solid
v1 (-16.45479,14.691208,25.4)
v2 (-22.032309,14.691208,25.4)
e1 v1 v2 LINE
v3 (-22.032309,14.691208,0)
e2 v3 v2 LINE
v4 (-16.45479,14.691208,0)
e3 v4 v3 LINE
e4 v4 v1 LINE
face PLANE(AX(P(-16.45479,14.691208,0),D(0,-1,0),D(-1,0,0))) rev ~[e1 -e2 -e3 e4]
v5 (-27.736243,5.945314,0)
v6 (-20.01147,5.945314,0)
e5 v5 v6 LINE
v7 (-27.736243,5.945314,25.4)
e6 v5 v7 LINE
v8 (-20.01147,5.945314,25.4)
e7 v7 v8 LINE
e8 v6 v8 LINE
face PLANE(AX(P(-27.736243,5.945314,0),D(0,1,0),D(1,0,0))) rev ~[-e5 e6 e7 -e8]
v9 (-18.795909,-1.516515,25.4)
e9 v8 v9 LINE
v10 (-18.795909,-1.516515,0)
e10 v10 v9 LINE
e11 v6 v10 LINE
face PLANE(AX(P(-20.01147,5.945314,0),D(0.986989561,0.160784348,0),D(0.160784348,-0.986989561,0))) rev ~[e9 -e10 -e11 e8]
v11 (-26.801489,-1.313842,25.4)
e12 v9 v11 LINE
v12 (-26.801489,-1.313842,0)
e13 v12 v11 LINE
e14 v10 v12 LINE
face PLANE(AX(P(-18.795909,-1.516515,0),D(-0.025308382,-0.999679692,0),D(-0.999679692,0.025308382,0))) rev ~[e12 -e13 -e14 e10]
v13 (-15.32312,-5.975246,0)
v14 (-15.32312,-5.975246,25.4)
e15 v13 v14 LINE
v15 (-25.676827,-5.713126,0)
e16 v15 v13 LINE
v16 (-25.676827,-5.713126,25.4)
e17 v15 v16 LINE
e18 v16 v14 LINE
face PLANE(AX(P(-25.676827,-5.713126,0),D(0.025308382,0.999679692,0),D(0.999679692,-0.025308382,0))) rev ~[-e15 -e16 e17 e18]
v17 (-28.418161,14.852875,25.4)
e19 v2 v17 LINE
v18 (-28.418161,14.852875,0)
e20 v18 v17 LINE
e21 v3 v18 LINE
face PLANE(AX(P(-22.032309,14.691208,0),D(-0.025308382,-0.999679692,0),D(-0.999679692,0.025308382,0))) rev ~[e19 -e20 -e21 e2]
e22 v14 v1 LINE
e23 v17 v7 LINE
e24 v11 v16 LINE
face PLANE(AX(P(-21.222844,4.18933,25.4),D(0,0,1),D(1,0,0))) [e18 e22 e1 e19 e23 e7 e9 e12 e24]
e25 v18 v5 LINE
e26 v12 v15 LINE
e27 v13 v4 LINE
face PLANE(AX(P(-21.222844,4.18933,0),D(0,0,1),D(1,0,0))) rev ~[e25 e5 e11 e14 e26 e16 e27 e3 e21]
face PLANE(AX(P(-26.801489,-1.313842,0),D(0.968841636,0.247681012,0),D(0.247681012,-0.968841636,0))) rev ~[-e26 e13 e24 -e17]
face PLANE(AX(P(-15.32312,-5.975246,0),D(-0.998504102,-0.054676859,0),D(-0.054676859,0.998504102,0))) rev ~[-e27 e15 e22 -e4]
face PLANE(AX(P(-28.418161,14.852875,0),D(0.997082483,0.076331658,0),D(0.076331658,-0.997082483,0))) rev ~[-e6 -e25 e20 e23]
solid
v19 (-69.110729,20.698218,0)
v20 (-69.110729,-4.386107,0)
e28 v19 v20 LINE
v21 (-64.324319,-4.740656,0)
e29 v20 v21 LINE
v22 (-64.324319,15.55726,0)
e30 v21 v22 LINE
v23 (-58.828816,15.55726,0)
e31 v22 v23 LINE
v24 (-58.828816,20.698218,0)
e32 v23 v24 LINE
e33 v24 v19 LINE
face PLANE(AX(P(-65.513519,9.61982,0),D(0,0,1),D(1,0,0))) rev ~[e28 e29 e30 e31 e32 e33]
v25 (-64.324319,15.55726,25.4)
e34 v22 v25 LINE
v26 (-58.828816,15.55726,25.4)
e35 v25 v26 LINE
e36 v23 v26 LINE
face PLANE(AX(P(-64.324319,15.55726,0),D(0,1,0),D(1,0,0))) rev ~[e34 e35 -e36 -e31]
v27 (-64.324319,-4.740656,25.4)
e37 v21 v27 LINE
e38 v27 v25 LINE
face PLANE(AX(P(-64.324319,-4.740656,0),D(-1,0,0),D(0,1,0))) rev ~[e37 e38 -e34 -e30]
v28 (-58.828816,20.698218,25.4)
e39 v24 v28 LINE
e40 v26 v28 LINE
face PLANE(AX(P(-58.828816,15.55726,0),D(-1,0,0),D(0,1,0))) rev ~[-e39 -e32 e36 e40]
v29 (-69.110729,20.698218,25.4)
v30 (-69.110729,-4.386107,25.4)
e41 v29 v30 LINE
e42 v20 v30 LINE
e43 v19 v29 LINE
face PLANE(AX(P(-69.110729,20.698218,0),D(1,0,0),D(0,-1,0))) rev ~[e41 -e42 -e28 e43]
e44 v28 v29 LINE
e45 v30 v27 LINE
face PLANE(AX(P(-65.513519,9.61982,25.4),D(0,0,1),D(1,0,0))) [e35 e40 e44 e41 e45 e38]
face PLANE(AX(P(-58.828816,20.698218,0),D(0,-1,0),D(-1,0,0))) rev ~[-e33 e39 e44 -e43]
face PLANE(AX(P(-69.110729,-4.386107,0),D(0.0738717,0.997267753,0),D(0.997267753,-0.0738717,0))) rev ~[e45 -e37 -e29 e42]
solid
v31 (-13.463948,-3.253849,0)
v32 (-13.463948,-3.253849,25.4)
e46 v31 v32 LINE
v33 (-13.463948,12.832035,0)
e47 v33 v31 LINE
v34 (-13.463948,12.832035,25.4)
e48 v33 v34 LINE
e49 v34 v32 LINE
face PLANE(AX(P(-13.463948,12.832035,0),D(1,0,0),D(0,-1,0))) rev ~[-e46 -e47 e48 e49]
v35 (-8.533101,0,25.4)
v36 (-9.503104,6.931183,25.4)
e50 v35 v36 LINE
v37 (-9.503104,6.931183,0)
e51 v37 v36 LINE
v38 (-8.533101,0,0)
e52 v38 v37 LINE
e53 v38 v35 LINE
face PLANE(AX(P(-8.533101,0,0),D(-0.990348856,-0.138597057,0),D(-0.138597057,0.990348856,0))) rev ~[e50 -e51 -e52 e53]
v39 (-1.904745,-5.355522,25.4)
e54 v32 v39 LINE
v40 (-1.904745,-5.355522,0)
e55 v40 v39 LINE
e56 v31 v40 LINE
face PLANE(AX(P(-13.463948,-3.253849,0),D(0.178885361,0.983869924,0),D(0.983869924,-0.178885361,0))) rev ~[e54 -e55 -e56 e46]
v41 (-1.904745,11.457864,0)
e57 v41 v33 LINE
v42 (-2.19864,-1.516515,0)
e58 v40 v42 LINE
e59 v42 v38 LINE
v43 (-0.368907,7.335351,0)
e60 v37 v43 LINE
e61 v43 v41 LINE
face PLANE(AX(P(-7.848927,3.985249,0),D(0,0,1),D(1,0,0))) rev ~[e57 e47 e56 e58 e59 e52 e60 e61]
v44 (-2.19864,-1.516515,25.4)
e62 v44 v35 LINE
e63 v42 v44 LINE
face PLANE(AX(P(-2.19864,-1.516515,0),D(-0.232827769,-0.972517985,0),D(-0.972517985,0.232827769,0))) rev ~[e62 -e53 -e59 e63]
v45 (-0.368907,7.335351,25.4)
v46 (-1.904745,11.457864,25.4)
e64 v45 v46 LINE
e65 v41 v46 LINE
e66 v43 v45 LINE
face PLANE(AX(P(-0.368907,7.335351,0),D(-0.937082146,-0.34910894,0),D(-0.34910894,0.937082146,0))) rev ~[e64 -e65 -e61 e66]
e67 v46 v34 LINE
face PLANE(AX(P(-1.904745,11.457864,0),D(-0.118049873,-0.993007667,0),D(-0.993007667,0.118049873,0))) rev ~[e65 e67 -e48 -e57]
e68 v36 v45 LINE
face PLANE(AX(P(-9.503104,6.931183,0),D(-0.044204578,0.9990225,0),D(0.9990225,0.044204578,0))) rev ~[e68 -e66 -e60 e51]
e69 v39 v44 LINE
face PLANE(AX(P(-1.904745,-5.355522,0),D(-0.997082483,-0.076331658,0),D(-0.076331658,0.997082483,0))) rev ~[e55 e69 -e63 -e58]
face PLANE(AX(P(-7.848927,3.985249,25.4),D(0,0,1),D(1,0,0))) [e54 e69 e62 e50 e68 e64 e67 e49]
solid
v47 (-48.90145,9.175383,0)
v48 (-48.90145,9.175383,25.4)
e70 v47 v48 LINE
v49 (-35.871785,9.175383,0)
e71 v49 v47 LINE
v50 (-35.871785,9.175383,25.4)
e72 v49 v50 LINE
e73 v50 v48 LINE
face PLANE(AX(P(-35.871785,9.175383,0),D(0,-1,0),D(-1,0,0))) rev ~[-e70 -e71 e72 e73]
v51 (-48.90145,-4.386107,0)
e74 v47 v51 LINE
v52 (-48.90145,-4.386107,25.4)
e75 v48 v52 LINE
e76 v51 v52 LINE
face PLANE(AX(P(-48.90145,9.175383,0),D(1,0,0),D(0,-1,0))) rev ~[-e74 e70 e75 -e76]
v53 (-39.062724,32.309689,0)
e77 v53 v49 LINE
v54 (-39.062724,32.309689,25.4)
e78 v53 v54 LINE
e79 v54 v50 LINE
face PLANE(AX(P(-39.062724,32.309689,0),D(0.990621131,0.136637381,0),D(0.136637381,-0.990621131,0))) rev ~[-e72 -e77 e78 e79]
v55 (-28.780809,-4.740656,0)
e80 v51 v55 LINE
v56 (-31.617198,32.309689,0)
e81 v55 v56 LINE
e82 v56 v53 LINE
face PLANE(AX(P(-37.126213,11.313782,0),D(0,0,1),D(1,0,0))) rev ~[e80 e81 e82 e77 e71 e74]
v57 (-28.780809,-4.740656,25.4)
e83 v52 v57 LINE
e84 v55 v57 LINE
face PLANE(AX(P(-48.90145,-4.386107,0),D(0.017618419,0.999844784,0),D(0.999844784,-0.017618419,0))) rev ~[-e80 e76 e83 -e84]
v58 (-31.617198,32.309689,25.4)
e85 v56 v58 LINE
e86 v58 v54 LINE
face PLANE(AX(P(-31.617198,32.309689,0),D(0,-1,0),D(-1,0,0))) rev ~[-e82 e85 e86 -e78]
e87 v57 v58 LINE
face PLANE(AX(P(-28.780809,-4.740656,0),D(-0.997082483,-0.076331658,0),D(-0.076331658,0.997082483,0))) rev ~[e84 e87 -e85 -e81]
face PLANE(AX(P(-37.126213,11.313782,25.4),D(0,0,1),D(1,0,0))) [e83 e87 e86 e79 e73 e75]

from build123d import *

# Parameters (mm, degrees)
F1_DEPTH = 25.4


# Not quite as in the source:
# - a feature of the source that left no trace in its solid (it failed there, or was rolled back) is left out


with BuildPart() as f1:
    # F0 (on Top) → F1 (new body)
    with BuildSketch(Plane.XY):
        Polygon((-58.8288158178, 20.6982176751), (-69.1107288003, 20.6982176751), (-69.1107288003, -4.3861074373), (-64.3243193626, -4.7406563535), (-64.3243193626, 15.5572602525), (-58.8288158178, 15.5572602525), align=None)
    extrude(amount=F1_DEPTH)


with BuildPart() as f1b:
    # F0 (on Top) → F1, piece 2 (new body)
    with BuildSketch(Plane.XY):
        Polygon((-35.8717851341, 9.1753825545), (-41.1013774574, 9.1753825545), (-48.9014498889, 9.1753825545), (-48.9014498889, -4.3861074373), (-28.7808086723, -4.7406563535), (-31.6171981394, 32.3096886277), (-39.0627235174, 32.3096886277), align=None)
    extrude(amount=F1_DEPTH)


with BuildPart() as f1c:
    # F0 (on Top) → F1, piece 3 (new body)
    with BuildSketch(Plane.XY):
        Polygon((-16.4547897875, 14.6912075579), (-22.0323093235, 14.6912075579), (-28.418160975, 14.8528749123), (-27.7362425849, 5.9453141228), (-20.0114697218, 5.9453141228), (-18.7959093807, -1.5165152081), (-26.8014892936, -1.3138420181), (-25.6768274582, -5.7131264287), (-15.3231201693, -5.9752459638), align=None)
    extrude(amount=F1_DEPTH)


with BuildPart() as f1d:
    # F0 (on Top) → F1, piece 4 (new body)
    with BuildSketch(Plane.XY):
        Polygon((-8.5331005976, 0), (-9.5031037927, 6.9311829284), (-0.3689071746, 7.3353513144), (-1.9047448877, 11.4578641951), (-13.463947922, 12.8320353106), (-13.463947922, -3.2538492233), (-1.9047448877, -5.3555215709), (-2.1986400516, -1.5165152081), align=None)
    extrude(amount=F1_DEPTH)


solid = Compound([f1.part, f1b.part, f1c.part, f1d.part])
